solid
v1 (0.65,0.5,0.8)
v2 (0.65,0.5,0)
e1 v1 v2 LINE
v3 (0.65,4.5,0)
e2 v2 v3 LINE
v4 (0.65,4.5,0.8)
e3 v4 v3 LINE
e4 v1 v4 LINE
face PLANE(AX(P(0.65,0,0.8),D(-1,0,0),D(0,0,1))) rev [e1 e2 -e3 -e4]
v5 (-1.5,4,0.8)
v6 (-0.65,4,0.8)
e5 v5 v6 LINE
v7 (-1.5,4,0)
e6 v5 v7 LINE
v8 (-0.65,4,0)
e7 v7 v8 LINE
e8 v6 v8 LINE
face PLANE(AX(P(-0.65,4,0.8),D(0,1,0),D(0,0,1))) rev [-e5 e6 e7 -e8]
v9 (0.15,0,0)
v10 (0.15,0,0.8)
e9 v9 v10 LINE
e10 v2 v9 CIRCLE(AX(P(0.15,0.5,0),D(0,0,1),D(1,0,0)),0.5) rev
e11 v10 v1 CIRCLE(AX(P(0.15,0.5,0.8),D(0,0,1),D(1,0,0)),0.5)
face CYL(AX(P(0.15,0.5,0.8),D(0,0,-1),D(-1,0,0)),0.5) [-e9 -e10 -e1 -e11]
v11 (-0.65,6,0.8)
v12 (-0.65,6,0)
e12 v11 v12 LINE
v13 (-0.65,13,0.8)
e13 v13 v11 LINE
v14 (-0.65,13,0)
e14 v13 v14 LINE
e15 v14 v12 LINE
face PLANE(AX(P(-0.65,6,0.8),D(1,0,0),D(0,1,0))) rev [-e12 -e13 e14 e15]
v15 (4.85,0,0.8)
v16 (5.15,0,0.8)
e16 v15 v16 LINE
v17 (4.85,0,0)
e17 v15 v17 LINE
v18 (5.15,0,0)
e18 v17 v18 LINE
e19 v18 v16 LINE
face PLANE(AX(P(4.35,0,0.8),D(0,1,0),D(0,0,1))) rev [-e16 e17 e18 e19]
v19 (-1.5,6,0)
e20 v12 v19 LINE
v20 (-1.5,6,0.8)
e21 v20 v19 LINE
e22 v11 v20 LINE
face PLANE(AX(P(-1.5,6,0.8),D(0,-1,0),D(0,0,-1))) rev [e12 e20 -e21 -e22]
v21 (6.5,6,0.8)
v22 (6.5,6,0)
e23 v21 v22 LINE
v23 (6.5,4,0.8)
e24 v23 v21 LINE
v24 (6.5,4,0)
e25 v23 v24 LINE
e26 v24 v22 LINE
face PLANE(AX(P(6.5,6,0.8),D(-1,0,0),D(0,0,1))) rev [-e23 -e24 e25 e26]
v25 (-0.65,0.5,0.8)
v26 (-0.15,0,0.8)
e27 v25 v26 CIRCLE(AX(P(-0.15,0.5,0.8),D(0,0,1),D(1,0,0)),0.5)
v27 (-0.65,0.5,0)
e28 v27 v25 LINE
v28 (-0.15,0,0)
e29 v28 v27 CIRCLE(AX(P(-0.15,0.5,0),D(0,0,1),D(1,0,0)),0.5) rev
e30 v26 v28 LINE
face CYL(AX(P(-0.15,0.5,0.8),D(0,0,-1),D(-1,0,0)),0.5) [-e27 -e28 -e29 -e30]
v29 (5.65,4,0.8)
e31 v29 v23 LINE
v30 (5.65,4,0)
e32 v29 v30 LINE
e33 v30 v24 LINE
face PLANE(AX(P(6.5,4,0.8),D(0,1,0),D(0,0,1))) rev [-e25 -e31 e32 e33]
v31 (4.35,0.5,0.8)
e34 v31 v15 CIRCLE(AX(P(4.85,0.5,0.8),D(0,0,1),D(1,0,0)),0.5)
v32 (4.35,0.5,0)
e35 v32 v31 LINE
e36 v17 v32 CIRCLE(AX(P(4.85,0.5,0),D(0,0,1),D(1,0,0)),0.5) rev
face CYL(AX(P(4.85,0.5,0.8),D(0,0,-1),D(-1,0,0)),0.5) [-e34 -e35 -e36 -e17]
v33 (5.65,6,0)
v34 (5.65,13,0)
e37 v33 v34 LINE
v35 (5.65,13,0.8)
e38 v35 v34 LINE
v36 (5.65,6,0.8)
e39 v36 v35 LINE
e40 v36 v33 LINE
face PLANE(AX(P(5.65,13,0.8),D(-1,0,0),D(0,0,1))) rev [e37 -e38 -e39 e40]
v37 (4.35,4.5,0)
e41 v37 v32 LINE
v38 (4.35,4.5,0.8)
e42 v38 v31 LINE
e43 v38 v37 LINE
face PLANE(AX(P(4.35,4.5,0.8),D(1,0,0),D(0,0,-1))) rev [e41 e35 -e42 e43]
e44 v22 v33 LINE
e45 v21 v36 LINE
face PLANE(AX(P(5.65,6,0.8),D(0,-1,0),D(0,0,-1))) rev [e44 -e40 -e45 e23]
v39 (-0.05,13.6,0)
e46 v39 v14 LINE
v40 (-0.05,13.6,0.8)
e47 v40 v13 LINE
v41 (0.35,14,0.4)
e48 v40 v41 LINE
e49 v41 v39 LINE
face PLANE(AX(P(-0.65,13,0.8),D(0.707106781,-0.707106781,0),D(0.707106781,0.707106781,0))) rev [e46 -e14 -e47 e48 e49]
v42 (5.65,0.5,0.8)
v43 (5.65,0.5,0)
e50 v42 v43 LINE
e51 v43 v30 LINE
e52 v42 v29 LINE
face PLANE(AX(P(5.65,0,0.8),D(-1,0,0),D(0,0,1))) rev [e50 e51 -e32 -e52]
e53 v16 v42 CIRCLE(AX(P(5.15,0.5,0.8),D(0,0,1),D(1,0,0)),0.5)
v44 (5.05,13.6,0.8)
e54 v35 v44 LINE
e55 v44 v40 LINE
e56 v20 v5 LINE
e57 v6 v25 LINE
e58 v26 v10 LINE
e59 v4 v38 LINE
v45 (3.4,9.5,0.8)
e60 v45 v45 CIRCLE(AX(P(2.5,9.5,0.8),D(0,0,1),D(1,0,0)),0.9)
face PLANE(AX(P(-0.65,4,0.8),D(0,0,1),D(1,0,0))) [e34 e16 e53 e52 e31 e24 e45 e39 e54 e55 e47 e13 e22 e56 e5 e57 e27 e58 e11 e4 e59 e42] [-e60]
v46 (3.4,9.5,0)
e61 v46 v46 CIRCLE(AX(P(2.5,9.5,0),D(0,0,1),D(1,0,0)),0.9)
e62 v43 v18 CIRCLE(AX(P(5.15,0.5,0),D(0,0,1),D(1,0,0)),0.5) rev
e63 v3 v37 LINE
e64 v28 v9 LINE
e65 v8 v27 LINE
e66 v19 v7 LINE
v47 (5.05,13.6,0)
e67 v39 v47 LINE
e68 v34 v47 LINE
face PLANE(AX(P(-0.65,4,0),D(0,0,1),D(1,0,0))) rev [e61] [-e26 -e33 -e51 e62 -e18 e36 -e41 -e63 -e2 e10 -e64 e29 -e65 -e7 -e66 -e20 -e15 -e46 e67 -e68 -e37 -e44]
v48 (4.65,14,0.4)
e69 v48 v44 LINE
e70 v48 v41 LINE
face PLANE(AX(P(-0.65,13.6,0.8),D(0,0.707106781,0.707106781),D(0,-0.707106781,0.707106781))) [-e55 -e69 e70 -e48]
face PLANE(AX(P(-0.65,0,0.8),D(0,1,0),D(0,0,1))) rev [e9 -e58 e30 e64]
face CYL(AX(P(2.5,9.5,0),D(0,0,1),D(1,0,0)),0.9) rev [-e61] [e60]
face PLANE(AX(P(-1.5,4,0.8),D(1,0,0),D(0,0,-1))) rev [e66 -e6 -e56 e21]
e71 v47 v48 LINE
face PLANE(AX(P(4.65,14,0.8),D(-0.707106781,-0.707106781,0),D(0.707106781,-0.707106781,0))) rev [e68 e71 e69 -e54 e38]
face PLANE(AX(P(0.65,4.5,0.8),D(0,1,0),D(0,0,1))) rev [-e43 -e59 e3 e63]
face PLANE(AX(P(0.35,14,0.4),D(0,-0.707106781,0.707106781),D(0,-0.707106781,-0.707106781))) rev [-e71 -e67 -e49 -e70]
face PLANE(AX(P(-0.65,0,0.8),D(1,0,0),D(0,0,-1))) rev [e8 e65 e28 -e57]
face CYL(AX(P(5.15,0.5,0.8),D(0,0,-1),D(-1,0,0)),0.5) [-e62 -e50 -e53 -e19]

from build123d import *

# Parameters (mm, degrees)
EXTRUSION1_DEPTH   = 0.8
CHANFREIN1_SIZE    = 0.4
CONG_1_R           = 0.5
SKETCH1_R          = 0.9
CUT_EXTRUDE1_DEPTH = 16.45606677


with BuildPart() as part:
    # Esquisse1 → Extrusion1 (new body)
    with BuildSketch(Plane.XY):
        Polygon((-0.65, 0), (0.65, 0), (0.65, 4.5), (4.35, 4.5), (4.35, 0), (5.65, 0), (5.65, 4), (6.5, 4), (6.5, 6), (5.65, 6), (5.65, 13), (4.65, 14), (0.35, 14), (-0.65, 13), (-0.65, 6), (-1.5, 6), (-1.5, 4), (-0.65, 4), align=None)
    extrude(amount=EXTRUSION1_DEPTH)

    # Chanfrein1
    chanfrein1_edges = [part.edges().sort_by_distance(p)[0] for p in [
        (2.5, 14, 0.8),
        (2.5, 14, 0),
    ]]
    chamfer(chanfrein1_edges, length=CHANFREIN1_SIZE - 0.0001)  # a hair under: the kernel refuses the full size

    # Congé1
    cong_1_edges = [part.edges().sort_by_distance(p)[0] for p in [
        (5.65, 0, 0.4),
        (4.35, 0, 0.4),
        (0.65, 0, 0.4),
        (-0.65, 0, 0.4),
    ]]
    fillet(cong_1_edges, radius=CONG_1_R)

    # Sketch1 → Cut-Extrude1 (cut, through all)
    with BuildSketch(Plane.XY.offset(0.8)):
        with Locations((2.5, 9.5)):
            Circle(SKETCH1_R)
    extrude(amount=-CUT_EXTRUDE1_DEPTH, mode=Mode.SUBTRACT)


solid = part.part
